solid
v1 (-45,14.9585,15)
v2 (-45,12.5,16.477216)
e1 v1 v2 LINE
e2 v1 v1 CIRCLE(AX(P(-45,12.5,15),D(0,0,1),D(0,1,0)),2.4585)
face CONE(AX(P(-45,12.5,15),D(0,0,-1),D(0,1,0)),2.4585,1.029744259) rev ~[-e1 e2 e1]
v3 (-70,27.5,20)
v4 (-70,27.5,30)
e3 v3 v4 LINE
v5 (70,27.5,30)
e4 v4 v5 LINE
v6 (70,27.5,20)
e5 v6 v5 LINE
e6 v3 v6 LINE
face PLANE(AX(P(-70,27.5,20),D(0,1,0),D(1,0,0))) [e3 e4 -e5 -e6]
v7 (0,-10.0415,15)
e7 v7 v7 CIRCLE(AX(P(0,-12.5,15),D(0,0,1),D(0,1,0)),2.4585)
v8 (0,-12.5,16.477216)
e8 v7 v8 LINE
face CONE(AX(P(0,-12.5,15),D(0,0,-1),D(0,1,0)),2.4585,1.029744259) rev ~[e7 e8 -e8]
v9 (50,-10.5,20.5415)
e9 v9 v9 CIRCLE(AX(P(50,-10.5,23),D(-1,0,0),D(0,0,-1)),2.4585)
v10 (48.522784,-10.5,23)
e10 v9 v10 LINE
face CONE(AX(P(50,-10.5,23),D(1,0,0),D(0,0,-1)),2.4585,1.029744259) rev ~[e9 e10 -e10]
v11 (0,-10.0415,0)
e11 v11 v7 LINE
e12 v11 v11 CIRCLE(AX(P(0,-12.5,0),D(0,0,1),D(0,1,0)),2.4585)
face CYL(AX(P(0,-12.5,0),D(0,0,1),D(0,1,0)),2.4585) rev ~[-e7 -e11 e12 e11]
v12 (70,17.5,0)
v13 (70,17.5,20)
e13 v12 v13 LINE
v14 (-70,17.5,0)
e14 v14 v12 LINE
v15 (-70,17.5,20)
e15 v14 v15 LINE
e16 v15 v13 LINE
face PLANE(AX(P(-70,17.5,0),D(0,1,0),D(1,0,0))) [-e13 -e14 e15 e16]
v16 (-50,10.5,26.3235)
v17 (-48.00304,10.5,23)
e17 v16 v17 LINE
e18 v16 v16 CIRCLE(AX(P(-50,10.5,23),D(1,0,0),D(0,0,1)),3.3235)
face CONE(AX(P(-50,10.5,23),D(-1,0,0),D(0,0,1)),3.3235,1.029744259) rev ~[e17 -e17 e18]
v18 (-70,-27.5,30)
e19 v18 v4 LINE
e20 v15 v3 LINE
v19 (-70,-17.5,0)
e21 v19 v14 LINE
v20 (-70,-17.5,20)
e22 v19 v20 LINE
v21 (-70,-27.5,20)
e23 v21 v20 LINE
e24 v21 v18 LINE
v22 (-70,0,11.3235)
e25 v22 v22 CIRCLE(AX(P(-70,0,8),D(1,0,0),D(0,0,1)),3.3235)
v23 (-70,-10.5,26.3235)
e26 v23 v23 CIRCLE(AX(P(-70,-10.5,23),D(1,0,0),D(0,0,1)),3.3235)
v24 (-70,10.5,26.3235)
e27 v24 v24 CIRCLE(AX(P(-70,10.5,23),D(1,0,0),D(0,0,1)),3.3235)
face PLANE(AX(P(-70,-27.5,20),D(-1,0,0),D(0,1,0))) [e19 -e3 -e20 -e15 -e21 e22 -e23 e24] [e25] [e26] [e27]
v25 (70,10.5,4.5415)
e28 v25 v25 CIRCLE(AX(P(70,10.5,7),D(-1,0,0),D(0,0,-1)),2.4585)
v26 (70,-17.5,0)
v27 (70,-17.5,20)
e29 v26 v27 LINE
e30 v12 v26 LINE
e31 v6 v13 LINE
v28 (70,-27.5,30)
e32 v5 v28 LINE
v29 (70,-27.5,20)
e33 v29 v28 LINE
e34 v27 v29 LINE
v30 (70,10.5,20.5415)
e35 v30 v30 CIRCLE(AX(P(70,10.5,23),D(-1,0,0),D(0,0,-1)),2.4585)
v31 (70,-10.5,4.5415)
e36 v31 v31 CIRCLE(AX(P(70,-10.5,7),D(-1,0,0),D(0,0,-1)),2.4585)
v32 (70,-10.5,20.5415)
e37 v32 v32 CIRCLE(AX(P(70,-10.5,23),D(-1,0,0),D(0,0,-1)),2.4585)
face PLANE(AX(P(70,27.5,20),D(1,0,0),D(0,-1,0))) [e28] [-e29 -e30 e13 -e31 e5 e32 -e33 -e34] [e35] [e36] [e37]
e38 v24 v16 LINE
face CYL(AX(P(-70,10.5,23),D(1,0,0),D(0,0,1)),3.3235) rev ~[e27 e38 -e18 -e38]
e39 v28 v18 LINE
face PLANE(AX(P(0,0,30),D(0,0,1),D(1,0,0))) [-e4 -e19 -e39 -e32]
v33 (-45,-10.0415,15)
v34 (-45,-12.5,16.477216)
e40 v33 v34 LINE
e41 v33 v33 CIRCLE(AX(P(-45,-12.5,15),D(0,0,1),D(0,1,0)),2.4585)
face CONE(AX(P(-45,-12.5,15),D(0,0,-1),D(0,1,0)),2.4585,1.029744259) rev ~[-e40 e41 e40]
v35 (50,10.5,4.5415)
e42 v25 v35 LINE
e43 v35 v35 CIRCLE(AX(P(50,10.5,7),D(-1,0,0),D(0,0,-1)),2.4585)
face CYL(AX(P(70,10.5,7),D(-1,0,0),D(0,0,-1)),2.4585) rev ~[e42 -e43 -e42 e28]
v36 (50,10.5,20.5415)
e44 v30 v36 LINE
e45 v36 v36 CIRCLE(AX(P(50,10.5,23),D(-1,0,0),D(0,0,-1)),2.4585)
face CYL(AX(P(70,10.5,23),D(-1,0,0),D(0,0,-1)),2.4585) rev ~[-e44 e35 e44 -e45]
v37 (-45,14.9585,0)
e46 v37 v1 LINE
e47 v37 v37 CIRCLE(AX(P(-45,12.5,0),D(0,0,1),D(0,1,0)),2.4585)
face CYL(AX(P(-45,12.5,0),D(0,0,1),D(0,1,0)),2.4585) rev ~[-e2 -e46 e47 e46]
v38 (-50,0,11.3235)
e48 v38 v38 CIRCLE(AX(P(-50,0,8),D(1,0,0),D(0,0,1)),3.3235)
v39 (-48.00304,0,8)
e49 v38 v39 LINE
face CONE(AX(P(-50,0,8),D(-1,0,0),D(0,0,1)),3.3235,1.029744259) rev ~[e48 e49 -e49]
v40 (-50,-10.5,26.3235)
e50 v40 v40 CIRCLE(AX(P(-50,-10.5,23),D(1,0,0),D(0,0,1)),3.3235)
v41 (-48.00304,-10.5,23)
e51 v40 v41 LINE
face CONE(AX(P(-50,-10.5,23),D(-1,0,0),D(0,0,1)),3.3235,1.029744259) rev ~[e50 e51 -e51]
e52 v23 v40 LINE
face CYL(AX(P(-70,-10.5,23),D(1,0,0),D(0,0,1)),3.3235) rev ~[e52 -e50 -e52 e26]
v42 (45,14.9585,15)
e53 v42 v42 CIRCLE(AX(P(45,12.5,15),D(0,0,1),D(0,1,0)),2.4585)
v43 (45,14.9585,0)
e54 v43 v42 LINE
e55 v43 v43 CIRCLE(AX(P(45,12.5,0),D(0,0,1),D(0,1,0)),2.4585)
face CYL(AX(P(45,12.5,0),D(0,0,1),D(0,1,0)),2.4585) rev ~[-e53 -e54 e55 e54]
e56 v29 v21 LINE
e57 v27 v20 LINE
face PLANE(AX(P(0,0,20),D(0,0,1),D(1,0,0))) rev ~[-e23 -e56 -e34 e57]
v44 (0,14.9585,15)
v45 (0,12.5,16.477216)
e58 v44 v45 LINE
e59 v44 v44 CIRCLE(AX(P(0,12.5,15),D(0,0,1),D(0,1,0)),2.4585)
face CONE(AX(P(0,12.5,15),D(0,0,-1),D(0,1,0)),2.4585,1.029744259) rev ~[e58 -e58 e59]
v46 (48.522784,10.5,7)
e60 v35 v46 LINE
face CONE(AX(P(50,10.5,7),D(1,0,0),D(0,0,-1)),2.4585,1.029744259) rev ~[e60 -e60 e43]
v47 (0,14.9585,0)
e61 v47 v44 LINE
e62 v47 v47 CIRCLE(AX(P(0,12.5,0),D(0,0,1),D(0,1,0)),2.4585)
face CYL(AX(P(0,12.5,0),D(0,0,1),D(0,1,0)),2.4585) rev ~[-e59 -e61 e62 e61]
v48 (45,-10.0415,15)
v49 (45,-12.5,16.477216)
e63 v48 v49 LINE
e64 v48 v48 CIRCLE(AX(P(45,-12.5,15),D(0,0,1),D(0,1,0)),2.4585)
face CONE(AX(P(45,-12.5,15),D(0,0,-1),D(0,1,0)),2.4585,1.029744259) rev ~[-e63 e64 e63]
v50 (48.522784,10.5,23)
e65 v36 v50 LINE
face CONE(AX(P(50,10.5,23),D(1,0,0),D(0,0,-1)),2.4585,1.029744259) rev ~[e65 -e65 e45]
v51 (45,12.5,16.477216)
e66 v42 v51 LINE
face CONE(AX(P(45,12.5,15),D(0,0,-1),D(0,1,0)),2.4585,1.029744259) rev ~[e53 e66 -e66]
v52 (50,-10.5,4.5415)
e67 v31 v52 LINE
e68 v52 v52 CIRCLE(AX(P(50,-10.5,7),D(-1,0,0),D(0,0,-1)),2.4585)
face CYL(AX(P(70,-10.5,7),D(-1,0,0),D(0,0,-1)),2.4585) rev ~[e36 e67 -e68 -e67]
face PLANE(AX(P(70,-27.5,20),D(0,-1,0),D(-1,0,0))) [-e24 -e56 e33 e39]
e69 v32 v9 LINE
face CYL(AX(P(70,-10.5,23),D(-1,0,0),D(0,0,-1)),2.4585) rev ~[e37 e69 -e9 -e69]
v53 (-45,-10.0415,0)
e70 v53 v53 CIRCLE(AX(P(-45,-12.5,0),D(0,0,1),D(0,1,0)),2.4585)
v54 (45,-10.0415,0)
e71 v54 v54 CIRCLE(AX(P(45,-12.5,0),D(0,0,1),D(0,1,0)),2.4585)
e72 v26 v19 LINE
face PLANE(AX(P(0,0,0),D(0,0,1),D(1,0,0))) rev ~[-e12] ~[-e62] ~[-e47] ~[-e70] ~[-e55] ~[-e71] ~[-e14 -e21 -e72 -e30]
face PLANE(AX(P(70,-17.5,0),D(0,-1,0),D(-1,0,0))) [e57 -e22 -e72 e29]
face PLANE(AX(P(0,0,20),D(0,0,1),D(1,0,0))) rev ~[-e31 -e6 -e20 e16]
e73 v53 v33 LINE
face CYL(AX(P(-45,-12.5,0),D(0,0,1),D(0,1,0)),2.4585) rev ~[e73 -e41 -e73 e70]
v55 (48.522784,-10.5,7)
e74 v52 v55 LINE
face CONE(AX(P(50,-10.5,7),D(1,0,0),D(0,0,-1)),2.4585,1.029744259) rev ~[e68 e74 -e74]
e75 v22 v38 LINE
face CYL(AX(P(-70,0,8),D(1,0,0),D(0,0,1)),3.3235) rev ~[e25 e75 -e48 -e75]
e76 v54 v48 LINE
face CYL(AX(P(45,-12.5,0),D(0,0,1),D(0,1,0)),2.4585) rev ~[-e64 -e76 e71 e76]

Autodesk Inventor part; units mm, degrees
ref_plane "YZ Plane" through (0, 0, 0) normal (1, 0, 0) x (0, 1, 0)
ref_plane "XZ Plane" through (0, 0, 0) normal (0, 1, 0) x (-1, 0, 0)
ref_plane "XY Plane" through (0, 0, 0) normal (0, 0, 1) x (1, 0, 0)
sketch "Sketch1" plane through (0, 0, 0) normal (0, 0, 1) x (1, 0, 0)
  line L0 (-70, 17.5) -> (70, 17.5)
  line L1 (70, 17.5) -> (70, -17.5)
  line L2 (70, -17.5) -> (-70, -17.5)
  line L3 (-70, -17.5) -> (-70, 17.5)
  line L4 (-70, 17.5) -> (70, -17.5) construction
  line L5 (70, 17.5) -> (-70, -17.5) construction
  point P0 (0, 0)
  dimension "d0" = 140
  dimension "d1" = 35
extrude "Extrusion1" add sketch "Sketch1" along normal blind 20
sketch "Sketch2" plane through (0, 0, 20) normal (0, 0, 1) x (1, 0, 0)
  line L0 (70, -27.5) -> (-70, -27.5)
  line L1 (-70, -27.5) -> (-70, 27.5)
  line L2 (-70, 27.5) -> (70, 27.5)
  line L3 (70, 27.5) -> (70, -27.5)
  line L4 (70, -27.5) -> (-70, 27.5) construction
  line L5 (-70, -27.5) -> (70, 27.5) construction
  point P0 (0, 0)
  dimension "d4" = 140
  dimension "d5" = 55
extrude "Extrusion2" add sketch "Sketch2" along normal blind 10
sketch "Sketch4" plane through (70, -17.5, 0) normal (1, 0, 0) x (0, 0, -1)
  line L0 (0, 0) -> (0, 35) projected
  point P0 (0, 17.5)
  point P1 (-7, 28)
  point P2 (0, 17.5)
  dimension "d24" = 10.5
  dimension "d25" = 7
hole "Hole2" at (70, 10.5, 7) direction (-1, 0, 0) diameter 4.917 depth 20 tip angle 118 thread size "M6x1" class "6H" standard "ISO Metric profile"
pattern_linear "Rectangular Pattern2" count 2 spacing 16 along (0, 0, 1) count 2 spacing 21 along (0, -1, 0) of "Hole2"
sketch "Sketch5" plane through (-70, -17.5, 0) normal (-1, 0, 0) x (0, 0, 1)
  line L0 (0, 35) -> (0, 0) projected
  line L1 (0, 17.5) -> (33.2341, 17.5) construction
  point P0 (0, 17.5)
  point P1 (8, 17.5)
  point P2 (23, 28)
  point P3 (23, 7)
  dimension "d39" = 8
  dimension "d40" = 15
  dimension "d41" = 15
  dimension "d42" = 10.5
  dimension "d43" = 10.5
hole "Hole3" at (-70, 0, 8) at (-70, 10.5, 23) at (-70, -10.5, 23) direction (1, 0, 0) diameter 6.647 depth 20 tip angle 118 thread size "M8x1.25" class "6H" standard "ISO Metric profile"
sketch "Sketch6" plane through (0, 0, 0) normal (0, 0, -1) x (-1, 0, 0)
  line L0 (-70, -17.5) -> (-70, 17.5) projected
  point P0 (0, 0)
  point P1 (-45, -12.5)
  dimension "d51" = 25
  dimension "d52" = 12.5
hole "Hole4" at (45, -12.5, 0) direction (0, 0, 1) diameter 4.917 depth 15 tip angle 118 thread size "M6x1" class "6H" standard "ISO Metric profile"
pattern_linear "Rectangular Pattern3" count 3 spacing 45 along (-1, 0, 0) count 2 spacing 25 along (0, 1, 0) of "Hole4"
properties part number "Fuhrung"
